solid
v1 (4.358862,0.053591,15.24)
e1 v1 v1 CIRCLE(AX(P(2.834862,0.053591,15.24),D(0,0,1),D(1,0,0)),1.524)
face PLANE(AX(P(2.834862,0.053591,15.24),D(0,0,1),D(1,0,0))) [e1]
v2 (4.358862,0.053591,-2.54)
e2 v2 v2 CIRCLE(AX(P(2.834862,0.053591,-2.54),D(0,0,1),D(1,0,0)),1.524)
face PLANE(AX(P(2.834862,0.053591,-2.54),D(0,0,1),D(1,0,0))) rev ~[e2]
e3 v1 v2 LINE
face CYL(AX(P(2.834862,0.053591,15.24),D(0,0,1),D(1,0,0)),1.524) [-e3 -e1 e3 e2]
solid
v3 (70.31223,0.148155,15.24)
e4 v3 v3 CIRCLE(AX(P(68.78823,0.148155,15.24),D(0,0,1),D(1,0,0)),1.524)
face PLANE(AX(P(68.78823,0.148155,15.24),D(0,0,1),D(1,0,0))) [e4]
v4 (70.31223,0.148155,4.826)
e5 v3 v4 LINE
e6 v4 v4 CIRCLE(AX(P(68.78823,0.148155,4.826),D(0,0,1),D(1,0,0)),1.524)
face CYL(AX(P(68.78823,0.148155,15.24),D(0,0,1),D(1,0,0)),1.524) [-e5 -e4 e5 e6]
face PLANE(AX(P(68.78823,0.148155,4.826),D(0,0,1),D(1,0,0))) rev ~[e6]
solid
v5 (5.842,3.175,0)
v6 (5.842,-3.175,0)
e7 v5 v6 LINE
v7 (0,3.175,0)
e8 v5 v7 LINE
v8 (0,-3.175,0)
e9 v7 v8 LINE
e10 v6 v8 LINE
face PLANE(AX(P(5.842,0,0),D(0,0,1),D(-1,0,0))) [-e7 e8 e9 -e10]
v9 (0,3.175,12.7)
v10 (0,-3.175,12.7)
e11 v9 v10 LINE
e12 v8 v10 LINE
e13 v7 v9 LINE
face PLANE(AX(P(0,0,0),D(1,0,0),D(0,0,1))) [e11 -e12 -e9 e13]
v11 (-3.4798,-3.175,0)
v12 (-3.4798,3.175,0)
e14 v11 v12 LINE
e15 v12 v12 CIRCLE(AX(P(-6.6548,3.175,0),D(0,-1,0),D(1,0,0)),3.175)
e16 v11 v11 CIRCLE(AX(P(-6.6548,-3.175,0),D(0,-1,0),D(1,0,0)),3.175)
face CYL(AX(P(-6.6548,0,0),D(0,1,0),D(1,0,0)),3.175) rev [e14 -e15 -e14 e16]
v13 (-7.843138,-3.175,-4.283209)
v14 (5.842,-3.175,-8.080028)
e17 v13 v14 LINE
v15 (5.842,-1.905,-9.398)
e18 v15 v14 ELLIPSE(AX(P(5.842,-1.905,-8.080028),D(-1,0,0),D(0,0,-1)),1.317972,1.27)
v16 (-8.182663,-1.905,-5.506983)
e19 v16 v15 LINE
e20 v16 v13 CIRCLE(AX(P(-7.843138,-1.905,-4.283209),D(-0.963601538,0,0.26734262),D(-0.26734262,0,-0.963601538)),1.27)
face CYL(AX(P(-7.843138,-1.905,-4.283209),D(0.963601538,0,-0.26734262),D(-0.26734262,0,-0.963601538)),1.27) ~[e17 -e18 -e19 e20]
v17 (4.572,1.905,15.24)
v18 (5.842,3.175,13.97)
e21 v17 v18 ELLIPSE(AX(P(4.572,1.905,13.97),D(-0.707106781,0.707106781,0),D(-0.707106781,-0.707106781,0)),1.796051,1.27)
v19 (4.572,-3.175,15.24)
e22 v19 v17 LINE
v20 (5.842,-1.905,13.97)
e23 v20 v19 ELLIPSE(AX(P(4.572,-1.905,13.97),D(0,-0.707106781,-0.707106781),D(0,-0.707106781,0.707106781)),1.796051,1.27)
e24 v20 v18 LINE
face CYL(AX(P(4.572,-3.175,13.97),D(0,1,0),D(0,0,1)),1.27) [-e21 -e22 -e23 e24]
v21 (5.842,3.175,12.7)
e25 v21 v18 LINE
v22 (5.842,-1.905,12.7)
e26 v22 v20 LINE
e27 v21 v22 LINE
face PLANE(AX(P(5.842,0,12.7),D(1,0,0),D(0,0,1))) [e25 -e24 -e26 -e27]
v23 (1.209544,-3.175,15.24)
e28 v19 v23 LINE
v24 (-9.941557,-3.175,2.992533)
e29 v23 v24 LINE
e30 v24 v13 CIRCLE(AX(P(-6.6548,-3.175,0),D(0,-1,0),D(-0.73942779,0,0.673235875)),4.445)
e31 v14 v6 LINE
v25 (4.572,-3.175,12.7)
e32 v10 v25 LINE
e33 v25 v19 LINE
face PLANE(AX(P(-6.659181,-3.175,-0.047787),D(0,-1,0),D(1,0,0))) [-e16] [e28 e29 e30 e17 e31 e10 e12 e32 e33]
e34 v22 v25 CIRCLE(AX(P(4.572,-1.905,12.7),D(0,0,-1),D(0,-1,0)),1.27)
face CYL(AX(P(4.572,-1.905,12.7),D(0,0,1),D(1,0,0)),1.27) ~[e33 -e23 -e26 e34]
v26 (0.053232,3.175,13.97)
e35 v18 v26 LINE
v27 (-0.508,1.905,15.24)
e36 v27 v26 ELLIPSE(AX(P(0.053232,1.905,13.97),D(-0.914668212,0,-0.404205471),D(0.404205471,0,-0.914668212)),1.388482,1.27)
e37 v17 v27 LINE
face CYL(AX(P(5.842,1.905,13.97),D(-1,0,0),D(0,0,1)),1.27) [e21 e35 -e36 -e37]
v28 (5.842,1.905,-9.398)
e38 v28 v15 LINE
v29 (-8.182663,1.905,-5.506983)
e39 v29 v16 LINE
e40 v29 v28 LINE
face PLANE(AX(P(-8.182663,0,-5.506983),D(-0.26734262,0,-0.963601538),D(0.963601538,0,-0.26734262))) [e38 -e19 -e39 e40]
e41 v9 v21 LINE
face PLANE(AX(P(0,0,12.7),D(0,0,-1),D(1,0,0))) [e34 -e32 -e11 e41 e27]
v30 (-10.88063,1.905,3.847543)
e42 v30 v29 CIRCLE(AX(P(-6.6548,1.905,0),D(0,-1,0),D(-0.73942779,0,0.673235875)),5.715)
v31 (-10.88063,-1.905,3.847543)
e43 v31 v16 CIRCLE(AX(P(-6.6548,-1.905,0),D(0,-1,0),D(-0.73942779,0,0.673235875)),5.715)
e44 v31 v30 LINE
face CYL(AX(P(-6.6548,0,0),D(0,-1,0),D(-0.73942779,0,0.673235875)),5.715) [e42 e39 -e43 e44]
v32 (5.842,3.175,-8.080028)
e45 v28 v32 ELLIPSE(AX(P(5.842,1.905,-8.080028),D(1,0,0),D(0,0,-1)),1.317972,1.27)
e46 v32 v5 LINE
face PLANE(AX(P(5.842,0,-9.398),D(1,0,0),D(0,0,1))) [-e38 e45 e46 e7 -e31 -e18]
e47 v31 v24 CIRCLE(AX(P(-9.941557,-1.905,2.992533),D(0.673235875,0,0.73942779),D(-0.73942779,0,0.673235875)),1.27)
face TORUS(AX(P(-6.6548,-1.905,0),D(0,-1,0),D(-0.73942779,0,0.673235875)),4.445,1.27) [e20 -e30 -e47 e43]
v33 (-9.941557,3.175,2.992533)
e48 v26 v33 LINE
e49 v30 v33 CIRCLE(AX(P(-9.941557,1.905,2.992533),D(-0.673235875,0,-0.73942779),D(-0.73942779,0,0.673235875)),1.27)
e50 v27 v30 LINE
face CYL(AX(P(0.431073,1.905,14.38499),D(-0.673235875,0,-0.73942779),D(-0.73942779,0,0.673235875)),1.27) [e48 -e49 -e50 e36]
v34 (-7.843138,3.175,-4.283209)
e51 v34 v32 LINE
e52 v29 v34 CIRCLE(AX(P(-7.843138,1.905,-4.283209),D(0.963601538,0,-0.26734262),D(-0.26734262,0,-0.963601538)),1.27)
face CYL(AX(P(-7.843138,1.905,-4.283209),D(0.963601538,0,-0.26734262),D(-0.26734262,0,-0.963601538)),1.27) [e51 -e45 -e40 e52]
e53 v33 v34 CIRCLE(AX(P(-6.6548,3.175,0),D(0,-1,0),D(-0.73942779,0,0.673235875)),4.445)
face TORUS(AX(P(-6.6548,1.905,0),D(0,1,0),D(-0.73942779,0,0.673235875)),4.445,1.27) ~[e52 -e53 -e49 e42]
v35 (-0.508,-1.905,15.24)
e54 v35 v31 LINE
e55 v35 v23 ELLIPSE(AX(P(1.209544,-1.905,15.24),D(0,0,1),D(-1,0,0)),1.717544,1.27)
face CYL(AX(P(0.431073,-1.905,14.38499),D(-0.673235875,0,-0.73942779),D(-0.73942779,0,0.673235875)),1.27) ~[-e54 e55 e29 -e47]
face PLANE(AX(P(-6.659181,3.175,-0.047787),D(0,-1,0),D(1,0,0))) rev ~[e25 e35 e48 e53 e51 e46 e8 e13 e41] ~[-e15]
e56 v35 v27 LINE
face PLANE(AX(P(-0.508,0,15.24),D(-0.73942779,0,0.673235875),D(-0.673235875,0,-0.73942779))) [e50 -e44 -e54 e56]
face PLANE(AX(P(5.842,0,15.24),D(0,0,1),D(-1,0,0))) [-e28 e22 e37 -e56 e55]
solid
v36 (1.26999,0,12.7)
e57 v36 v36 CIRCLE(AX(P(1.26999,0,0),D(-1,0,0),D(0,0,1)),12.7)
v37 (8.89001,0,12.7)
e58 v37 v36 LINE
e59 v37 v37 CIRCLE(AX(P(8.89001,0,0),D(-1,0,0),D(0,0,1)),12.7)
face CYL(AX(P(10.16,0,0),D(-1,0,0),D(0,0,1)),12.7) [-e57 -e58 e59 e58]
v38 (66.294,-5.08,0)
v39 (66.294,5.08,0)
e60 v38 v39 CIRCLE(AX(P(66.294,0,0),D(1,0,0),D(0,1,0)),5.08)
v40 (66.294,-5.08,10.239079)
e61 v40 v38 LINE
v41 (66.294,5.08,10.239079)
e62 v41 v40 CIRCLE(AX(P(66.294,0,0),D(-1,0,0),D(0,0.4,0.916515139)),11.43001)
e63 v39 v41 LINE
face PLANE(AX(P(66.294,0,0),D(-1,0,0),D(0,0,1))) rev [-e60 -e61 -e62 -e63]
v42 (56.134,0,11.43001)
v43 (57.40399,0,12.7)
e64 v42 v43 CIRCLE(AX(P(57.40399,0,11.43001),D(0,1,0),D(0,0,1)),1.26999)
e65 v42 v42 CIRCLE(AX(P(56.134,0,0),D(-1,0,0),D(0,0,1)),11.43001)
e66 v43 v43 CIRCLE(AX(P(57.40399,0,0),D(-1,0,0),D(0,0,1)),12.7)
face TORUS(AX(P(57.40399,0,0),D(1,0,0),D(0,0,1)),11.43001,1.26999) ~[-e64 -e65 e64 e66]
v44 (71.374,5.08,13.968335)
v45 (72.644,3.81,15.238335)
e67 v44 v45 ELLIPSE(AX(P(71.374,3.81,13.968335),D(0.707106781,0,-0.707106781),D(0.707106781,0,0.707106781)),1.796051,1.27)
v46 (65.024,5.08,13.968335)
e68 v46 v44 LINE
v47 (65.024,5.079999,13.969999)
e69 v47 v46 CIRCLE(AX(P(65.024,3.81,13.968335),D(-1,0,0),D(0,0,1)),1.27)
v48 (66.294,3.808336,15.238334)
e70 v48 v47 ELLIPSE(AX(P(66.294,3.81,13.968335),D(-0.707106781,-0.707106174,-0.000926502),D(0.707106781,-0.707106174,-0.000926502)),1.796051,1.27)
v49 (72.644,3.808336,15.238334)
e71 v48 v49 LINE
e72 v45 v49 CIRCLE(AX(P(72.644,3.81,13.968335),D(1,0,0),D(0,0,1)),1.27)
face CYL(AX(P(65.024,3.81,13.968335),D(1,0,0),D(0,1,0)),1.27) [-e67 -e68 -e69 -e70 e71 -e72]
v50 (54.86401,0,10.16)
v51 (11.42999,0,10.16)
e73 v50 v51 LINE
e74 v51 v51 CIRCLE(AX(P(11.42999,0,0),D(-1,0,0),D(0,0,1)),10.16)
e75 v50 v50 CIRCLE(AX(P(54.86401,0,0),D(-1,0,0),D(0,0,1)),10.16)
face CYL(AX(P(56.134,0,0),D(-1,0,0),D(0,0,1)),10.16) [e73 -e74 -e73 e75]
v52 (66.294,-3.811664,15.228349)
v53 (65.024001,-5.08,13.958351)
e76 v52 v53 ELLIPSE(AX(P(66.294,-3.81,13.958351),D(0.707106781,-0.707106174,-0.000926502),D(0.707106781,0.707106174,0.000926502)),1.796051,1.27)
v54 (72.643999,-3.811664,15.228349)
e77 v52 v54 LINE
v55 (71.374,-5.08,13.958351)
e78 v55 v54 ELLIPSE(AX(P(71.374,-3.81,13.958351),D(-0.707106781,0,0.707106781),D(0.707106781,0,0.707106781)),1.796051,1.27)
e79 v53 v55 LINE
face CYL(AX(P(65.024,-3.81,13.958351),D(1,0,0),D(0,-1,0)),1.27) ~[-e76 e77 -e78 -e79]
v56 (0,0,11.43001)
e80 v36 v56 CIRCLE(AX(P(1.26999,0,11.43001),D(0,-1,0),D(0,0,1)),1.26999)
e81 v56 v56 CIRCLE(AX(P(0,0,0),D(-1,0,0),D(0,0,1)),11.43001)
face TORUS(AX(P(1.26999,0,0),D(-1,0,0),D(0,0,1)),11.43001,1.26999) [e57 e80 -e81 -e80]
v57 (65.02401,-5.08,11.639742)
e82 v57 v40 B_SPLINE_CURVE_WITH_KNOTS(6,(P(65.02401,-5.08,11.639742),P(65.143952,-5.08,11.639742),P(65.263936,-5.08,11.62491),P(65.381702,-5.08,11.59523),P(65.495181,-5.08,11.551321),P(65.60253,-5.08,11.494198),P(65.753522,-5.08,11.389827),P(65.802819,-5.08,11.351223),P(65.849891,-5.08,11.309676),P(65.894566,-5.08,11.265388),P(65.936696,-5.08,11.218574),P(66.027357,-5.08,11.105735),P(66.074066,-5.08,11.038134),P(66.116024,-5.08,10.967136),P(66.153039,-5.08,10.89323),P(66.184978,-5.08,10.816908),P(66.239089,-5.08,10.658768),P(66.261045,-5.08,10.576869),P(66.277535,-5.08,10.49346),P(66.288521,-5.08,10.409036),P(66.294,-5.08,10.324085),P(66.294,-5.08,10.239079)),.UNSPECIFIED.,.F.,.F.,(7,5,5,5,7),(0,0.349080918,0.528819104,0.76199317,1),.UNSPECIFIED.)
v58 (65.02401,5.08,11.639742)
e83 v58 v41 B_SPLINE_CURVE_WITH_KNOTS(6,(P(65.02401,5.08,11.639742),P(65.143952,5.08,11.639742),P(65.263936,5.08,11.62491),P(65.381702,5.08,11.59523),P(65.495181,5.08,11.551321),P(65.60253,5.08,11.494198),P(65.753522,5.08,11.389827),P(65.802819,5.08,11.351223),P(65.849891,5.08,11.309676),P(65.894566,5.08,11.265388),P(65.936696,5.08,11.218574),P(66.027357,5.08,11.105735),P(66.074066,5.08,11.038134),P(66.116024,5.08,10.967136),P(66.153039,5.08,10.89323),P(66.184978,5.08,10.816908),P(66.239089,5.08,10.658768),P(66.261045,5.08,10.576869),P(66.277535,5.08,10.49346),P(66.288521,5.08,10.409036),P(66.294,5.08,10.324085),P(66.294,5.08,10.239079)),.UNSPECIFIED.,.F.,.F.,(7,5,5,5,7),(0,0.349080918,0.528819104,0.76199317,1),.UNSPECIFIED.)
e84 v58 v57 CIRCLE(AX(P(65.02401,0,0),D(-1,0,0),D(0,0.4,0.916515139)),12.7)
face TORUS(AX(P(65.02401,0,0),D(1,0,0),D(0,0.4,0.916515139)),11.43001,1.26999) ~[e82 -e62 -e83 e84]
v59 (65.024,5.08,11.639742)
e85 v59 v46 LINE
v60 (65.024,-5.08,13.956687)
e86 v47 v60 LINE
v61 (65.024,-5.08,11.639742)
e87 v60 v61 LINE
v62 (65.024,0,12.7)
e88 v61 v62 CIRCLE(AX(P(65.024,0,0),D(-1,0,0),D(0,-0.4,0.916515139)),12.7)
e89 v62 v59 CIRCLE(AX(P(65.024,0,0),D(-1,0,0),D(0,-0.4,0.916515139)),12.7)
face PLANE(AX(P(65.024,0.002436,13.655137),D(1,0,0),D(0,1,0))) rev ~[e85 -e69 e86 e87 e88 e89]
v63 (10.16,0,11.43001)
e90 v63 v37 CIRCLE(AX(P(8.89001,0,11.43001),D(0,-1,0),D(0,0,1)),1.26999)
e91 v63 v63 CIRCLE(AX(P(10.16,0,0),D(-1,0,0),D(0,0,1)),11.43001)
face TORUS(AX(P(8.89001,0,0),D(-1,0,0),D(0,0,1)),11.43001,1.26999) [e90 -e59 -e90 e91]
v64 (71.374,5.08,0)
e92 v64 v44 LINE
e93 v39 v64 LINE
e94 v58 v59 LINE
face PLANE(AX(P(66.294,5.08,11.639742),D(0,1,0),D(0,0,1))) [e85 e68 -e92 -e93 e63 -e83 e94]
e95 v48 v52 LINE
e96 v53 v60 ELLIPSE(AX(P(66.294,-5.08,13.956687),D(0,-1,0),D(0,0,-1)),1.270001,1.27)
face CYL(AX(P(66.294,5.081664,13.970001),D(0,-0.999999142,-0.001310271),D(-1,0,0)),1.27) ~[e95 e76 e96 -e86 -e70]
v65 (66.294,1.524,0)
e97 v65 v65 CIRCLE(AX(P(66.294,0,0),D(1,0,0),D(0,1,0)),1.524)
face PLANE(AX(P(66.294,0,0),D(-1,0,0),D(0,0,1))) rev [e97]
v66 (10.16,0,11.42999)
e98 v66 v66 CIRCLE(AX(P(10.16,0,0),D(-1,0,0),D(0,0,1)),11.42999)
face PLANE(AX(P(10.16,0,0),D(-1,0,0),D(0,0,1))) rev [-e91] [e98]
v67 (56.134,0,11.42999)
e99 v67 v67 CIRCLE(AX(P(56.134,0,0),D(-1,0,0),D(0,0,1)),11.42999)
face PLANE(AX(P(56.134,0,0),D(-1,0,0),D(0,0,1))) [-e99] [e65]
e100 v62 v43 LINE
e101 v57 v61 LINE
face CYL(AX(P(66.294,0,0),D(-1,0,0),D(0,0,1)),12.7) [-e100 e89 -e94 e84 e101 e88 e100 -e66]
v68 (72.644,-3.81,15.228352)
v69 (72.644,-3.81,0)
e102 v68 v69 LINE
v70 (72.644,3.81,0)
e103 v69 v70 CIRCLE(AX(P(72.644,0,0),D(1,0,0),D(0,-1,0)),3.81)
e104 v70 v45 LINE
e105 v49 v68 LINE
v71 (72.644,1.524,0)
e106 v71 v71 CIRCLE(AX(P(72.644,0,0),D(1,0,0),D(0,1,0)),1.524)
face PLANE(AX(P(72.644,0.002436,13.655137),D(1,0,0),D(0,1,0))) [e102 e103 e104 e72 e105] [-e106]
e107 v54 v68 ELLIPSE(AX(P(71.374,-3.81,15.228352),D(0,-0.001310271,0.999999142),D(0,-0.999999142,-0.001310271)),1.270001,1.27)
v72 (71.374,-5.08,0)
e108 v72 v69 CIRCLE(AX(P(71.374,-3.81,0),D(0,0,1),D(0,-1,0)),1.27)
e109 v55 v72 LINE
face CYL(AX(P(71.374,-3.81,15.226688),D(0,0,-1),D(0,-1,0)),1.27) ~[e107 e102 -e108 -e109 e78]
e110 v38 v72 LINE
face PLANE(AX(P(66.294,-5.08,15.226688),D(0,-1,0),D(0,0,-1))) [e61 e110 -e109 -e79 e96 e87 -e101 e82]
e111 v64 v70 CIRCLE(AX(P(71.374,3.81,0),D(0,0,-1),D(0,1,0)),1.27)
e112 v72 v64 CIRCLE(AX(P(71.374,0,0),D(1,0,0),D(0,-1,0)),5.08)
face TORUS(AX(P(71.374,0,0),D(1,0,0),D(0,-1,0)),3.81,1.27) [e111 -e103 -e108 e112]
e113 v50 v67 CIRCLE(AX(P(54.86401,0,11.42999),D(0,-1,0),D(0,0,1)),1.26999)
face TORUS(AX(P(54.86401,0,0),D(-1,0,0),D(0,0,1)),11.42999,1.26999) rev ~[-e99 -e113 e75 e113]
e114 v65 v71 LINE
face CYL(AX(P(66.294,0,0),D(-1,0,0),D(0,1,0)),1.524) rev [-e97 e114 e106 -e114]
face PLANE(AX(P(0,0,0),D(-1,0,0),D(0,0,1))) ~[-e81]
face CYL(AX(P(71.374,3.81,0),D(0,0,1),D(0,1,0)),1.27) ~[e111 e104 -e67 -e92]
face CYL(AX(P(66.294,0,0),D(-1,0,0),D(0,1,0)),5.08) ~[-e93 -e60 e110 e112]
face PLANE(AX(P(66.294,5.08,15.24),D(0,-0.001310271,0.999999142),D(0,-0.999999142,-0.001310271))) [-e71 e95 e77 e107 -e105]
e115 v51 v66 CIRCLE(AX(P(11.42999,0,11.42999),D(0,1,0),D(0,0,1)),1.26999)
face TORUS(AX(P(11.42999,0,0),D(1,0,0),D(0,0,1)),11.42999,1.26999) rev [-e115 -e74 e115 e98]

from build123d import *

# Parameters (mm, degrees)
F0_W     = 5.842
F0_H     = 12.7
F0_R     = 3.175
F2_DEPTH = 3.175
F3_R     = 1.524
F4_DEPTH = 6.35
F5_DEPTH = 1.27
F6_R     = 1.524
F7_DEPTH = 17.78
F8_DEPTH = 10.414
F9_R     = 1.26999
F10_R    = 1.26999
F11_R    = 1.27
F12_R    = 1.27


# Not quite as in the source:
# - a fillet or chamfer is up to 0.001 mm smaller than in the source, because OpenCascade refuses the exact size


with BuildPart() as f1:
    # F0 (on Front) → F1 (revolve)
    with BuildSketch(Plane.XZ):
        Polygon((5.842, 12.7), (5.842, 0), (66.294, 0), (66.294, 12.7), (56.134, 12.7), (56.134, 10.16), (10.16, 10.16), (10.16, 12.7), align=None)
        with Locations((2.921, 6.35)):
            Rectangle(F0_W, F0_H)
    revolve(axis=Axis((33.147, 0, 0), (-1, 0, 0)))

    # F3 (on face) → F4 (join)
    with BuildSketch(Plane.YZ.offset(66.294)):
        with BuildLine():
            ThreePointArc((-5.08, 11.6397422652), (0, 12.7), (5.08, 11.6397422652))
            Line((5.08, 11.6397422652), (5.08, 15.24))
            Line((5.08, 15.24), (-5.08, 15.2266876324))
            Line((-5.08, 15.2266876324), (-5.08, 11.6397422652))
        make_face()
        with BuildLine():
            ThreePointArc((-5.08, 0), (0, 5.08), (5.08, 0))
            Line((5.08, 0), (5.08, 11.6397422652))
            ThreePointArc((5.08, 11.6397422652), (0, 12.7), (-5.08, 11.6397422652))
            Line((-5.08, 11.6397422652), (-5.08, 0))
        make_face()
        with BuildLine():
            ThreePointArc((-5.08, 0), (0, -5.08), (5.08, 0))
            ThreePointArc((5.08, 0), (0, 5.08), (-5.08, 0))
        make_face()
        Circle(F3_R, mode=Mode.SUBTRACT)
    extrude(amount=F4_DEPTH)

    # F5 (add): a face of the model
    f5_faces = [f1.faces().sort_by_distance(p)[0] for p in [
        (66.294, 0.0039127163, 13.7759032878),
    ]]
    extrude(f5_faces, amount=F5_DEPTH)

    # F9 (radius 1.27 in the source; OpenCascade refuses exactly that, so slightly less here)
    f9_edges = [f1.edges().sort_by_distance(p)[0] for p in [
        (10.16, 0, -12.7),
        (0, 0, -12.7),
        (5.08, 0, 12.7),
        (10.16, 0, -10.16),
    ]]
    fillet(f9_edges, radius=F9_R)

    # F10 (radius 1.27 in the source; OpenCascade refuses exactly that, so slightly less here)
    f10_edges = [f1.edges().sort_by_distance(p)[0] for p in [
        (56.134, 0, -12.7),
        (56.134, 0, -10.16),
        (66.294, 0, -12.7),
    ]]
    fillet(f10_edges, radius=F10_R)

    # F12
    f12_edges = [f1.edges().sort_by_distance(p)[0] for p in [
        (72.644, 0, -5.08),
        (72.644, -5.08, 7.613344),
        (68.834, -5.08, 15.226688),
        (68.834, 5.08, 15.24),
        (65.024, 0, 15.233344),
    ]]
    fillet(f12_edges, radius=F12_R)


with BuildPart() as f2:
    # F0 (on Front) → F2 (new body, symmetric)
    with BuildSketch(Plane.XZ):
        with BuildLine():
            ThreePointArc((-8.1826630726, -5.5069827884), (-3.1957909266, -4.5493385486), (-0.9398, 0))
            ThreePointArc((-0.9398, 0), (-4.5919612295, 5.3297205562), (-10.8806298187, 3.8475430269))
            ThreePointArc((-10.8806298187, 3.8475430269), (-12.1459778134, -1.5837270034), (-8.1826630726, -5.5069827884))
        make_face()
        with Locations((-6.6548, 0)):
            Circle(F0_R, mode=Mode.SUBTRACT)
        with BuildLine():
            Line((5.842, 0), (0, 0))
            Line((0, 0), (-0.9398, 0))
            ThreePointArc((-0.9398, 0), (-3.1957909266, -4.5493385486), (-8.1826630726, -5.5069827884))
            Line((-8.1826630726, -5.5069827884), (5.842, -9.398))
            Line((5.842, -9.398), (5.842, 0))
        make_face()
        with BuildLine():
            Line((-0.9398, 0), (0, 0))
            Line((0, 0), (0, 12.7))
            Line((0, 12.7), (5.842, 12.7))
            Line((5.842, 12.7), (5.842, 15.24))
            Line((5.842, 15.24), (-0.508, 15.24))
            Line((-0.508, 15.24), (-10.8806298187, 3.8475430269))
            ThreePointArc((-10.8806298187, 3.8475430269), (-4.5919612295, 5.3297205562), (-0.9398, 0))
        make_face()
    extrude(amount=F2_DEPTH, both=True)

    # F11
    f11_edges = [f2.edges().sort_by_distance(p)[0] for p in [
        (-12.145978, -3.175, -1.583727),
        (-5.694315, 3.175, 9.543772),
        (5.842, -3.175, 13.97),
        (2.667, 3.175, 15.24),
        (5.842, 0, 15.24),
    ]]
    fillet(f11_edges, radius=F11_R)


with BuildPart() as f7:
    # F6 (on face) → F7 (new body)
    with BuildSketch(Plane.XY.offset(15.24)):
        with Locations((2.8348624219, 0.0535906694)):
            Circle(F6_R)
    extrude(amount=-F7_DEPTH)


with BuildPart() as f8:
    # F6 (on face) → F8 (new body)
    with BuildSketch(Plane.XY.offset(15.24)):
        with Locations((68.7882303587, 0.1481550013)):
            Circle(F6_R)
    extrude(amount=-F8_DEPTH)


solid = Compound([f1.part, f2.part, f7.part, f8.part])
